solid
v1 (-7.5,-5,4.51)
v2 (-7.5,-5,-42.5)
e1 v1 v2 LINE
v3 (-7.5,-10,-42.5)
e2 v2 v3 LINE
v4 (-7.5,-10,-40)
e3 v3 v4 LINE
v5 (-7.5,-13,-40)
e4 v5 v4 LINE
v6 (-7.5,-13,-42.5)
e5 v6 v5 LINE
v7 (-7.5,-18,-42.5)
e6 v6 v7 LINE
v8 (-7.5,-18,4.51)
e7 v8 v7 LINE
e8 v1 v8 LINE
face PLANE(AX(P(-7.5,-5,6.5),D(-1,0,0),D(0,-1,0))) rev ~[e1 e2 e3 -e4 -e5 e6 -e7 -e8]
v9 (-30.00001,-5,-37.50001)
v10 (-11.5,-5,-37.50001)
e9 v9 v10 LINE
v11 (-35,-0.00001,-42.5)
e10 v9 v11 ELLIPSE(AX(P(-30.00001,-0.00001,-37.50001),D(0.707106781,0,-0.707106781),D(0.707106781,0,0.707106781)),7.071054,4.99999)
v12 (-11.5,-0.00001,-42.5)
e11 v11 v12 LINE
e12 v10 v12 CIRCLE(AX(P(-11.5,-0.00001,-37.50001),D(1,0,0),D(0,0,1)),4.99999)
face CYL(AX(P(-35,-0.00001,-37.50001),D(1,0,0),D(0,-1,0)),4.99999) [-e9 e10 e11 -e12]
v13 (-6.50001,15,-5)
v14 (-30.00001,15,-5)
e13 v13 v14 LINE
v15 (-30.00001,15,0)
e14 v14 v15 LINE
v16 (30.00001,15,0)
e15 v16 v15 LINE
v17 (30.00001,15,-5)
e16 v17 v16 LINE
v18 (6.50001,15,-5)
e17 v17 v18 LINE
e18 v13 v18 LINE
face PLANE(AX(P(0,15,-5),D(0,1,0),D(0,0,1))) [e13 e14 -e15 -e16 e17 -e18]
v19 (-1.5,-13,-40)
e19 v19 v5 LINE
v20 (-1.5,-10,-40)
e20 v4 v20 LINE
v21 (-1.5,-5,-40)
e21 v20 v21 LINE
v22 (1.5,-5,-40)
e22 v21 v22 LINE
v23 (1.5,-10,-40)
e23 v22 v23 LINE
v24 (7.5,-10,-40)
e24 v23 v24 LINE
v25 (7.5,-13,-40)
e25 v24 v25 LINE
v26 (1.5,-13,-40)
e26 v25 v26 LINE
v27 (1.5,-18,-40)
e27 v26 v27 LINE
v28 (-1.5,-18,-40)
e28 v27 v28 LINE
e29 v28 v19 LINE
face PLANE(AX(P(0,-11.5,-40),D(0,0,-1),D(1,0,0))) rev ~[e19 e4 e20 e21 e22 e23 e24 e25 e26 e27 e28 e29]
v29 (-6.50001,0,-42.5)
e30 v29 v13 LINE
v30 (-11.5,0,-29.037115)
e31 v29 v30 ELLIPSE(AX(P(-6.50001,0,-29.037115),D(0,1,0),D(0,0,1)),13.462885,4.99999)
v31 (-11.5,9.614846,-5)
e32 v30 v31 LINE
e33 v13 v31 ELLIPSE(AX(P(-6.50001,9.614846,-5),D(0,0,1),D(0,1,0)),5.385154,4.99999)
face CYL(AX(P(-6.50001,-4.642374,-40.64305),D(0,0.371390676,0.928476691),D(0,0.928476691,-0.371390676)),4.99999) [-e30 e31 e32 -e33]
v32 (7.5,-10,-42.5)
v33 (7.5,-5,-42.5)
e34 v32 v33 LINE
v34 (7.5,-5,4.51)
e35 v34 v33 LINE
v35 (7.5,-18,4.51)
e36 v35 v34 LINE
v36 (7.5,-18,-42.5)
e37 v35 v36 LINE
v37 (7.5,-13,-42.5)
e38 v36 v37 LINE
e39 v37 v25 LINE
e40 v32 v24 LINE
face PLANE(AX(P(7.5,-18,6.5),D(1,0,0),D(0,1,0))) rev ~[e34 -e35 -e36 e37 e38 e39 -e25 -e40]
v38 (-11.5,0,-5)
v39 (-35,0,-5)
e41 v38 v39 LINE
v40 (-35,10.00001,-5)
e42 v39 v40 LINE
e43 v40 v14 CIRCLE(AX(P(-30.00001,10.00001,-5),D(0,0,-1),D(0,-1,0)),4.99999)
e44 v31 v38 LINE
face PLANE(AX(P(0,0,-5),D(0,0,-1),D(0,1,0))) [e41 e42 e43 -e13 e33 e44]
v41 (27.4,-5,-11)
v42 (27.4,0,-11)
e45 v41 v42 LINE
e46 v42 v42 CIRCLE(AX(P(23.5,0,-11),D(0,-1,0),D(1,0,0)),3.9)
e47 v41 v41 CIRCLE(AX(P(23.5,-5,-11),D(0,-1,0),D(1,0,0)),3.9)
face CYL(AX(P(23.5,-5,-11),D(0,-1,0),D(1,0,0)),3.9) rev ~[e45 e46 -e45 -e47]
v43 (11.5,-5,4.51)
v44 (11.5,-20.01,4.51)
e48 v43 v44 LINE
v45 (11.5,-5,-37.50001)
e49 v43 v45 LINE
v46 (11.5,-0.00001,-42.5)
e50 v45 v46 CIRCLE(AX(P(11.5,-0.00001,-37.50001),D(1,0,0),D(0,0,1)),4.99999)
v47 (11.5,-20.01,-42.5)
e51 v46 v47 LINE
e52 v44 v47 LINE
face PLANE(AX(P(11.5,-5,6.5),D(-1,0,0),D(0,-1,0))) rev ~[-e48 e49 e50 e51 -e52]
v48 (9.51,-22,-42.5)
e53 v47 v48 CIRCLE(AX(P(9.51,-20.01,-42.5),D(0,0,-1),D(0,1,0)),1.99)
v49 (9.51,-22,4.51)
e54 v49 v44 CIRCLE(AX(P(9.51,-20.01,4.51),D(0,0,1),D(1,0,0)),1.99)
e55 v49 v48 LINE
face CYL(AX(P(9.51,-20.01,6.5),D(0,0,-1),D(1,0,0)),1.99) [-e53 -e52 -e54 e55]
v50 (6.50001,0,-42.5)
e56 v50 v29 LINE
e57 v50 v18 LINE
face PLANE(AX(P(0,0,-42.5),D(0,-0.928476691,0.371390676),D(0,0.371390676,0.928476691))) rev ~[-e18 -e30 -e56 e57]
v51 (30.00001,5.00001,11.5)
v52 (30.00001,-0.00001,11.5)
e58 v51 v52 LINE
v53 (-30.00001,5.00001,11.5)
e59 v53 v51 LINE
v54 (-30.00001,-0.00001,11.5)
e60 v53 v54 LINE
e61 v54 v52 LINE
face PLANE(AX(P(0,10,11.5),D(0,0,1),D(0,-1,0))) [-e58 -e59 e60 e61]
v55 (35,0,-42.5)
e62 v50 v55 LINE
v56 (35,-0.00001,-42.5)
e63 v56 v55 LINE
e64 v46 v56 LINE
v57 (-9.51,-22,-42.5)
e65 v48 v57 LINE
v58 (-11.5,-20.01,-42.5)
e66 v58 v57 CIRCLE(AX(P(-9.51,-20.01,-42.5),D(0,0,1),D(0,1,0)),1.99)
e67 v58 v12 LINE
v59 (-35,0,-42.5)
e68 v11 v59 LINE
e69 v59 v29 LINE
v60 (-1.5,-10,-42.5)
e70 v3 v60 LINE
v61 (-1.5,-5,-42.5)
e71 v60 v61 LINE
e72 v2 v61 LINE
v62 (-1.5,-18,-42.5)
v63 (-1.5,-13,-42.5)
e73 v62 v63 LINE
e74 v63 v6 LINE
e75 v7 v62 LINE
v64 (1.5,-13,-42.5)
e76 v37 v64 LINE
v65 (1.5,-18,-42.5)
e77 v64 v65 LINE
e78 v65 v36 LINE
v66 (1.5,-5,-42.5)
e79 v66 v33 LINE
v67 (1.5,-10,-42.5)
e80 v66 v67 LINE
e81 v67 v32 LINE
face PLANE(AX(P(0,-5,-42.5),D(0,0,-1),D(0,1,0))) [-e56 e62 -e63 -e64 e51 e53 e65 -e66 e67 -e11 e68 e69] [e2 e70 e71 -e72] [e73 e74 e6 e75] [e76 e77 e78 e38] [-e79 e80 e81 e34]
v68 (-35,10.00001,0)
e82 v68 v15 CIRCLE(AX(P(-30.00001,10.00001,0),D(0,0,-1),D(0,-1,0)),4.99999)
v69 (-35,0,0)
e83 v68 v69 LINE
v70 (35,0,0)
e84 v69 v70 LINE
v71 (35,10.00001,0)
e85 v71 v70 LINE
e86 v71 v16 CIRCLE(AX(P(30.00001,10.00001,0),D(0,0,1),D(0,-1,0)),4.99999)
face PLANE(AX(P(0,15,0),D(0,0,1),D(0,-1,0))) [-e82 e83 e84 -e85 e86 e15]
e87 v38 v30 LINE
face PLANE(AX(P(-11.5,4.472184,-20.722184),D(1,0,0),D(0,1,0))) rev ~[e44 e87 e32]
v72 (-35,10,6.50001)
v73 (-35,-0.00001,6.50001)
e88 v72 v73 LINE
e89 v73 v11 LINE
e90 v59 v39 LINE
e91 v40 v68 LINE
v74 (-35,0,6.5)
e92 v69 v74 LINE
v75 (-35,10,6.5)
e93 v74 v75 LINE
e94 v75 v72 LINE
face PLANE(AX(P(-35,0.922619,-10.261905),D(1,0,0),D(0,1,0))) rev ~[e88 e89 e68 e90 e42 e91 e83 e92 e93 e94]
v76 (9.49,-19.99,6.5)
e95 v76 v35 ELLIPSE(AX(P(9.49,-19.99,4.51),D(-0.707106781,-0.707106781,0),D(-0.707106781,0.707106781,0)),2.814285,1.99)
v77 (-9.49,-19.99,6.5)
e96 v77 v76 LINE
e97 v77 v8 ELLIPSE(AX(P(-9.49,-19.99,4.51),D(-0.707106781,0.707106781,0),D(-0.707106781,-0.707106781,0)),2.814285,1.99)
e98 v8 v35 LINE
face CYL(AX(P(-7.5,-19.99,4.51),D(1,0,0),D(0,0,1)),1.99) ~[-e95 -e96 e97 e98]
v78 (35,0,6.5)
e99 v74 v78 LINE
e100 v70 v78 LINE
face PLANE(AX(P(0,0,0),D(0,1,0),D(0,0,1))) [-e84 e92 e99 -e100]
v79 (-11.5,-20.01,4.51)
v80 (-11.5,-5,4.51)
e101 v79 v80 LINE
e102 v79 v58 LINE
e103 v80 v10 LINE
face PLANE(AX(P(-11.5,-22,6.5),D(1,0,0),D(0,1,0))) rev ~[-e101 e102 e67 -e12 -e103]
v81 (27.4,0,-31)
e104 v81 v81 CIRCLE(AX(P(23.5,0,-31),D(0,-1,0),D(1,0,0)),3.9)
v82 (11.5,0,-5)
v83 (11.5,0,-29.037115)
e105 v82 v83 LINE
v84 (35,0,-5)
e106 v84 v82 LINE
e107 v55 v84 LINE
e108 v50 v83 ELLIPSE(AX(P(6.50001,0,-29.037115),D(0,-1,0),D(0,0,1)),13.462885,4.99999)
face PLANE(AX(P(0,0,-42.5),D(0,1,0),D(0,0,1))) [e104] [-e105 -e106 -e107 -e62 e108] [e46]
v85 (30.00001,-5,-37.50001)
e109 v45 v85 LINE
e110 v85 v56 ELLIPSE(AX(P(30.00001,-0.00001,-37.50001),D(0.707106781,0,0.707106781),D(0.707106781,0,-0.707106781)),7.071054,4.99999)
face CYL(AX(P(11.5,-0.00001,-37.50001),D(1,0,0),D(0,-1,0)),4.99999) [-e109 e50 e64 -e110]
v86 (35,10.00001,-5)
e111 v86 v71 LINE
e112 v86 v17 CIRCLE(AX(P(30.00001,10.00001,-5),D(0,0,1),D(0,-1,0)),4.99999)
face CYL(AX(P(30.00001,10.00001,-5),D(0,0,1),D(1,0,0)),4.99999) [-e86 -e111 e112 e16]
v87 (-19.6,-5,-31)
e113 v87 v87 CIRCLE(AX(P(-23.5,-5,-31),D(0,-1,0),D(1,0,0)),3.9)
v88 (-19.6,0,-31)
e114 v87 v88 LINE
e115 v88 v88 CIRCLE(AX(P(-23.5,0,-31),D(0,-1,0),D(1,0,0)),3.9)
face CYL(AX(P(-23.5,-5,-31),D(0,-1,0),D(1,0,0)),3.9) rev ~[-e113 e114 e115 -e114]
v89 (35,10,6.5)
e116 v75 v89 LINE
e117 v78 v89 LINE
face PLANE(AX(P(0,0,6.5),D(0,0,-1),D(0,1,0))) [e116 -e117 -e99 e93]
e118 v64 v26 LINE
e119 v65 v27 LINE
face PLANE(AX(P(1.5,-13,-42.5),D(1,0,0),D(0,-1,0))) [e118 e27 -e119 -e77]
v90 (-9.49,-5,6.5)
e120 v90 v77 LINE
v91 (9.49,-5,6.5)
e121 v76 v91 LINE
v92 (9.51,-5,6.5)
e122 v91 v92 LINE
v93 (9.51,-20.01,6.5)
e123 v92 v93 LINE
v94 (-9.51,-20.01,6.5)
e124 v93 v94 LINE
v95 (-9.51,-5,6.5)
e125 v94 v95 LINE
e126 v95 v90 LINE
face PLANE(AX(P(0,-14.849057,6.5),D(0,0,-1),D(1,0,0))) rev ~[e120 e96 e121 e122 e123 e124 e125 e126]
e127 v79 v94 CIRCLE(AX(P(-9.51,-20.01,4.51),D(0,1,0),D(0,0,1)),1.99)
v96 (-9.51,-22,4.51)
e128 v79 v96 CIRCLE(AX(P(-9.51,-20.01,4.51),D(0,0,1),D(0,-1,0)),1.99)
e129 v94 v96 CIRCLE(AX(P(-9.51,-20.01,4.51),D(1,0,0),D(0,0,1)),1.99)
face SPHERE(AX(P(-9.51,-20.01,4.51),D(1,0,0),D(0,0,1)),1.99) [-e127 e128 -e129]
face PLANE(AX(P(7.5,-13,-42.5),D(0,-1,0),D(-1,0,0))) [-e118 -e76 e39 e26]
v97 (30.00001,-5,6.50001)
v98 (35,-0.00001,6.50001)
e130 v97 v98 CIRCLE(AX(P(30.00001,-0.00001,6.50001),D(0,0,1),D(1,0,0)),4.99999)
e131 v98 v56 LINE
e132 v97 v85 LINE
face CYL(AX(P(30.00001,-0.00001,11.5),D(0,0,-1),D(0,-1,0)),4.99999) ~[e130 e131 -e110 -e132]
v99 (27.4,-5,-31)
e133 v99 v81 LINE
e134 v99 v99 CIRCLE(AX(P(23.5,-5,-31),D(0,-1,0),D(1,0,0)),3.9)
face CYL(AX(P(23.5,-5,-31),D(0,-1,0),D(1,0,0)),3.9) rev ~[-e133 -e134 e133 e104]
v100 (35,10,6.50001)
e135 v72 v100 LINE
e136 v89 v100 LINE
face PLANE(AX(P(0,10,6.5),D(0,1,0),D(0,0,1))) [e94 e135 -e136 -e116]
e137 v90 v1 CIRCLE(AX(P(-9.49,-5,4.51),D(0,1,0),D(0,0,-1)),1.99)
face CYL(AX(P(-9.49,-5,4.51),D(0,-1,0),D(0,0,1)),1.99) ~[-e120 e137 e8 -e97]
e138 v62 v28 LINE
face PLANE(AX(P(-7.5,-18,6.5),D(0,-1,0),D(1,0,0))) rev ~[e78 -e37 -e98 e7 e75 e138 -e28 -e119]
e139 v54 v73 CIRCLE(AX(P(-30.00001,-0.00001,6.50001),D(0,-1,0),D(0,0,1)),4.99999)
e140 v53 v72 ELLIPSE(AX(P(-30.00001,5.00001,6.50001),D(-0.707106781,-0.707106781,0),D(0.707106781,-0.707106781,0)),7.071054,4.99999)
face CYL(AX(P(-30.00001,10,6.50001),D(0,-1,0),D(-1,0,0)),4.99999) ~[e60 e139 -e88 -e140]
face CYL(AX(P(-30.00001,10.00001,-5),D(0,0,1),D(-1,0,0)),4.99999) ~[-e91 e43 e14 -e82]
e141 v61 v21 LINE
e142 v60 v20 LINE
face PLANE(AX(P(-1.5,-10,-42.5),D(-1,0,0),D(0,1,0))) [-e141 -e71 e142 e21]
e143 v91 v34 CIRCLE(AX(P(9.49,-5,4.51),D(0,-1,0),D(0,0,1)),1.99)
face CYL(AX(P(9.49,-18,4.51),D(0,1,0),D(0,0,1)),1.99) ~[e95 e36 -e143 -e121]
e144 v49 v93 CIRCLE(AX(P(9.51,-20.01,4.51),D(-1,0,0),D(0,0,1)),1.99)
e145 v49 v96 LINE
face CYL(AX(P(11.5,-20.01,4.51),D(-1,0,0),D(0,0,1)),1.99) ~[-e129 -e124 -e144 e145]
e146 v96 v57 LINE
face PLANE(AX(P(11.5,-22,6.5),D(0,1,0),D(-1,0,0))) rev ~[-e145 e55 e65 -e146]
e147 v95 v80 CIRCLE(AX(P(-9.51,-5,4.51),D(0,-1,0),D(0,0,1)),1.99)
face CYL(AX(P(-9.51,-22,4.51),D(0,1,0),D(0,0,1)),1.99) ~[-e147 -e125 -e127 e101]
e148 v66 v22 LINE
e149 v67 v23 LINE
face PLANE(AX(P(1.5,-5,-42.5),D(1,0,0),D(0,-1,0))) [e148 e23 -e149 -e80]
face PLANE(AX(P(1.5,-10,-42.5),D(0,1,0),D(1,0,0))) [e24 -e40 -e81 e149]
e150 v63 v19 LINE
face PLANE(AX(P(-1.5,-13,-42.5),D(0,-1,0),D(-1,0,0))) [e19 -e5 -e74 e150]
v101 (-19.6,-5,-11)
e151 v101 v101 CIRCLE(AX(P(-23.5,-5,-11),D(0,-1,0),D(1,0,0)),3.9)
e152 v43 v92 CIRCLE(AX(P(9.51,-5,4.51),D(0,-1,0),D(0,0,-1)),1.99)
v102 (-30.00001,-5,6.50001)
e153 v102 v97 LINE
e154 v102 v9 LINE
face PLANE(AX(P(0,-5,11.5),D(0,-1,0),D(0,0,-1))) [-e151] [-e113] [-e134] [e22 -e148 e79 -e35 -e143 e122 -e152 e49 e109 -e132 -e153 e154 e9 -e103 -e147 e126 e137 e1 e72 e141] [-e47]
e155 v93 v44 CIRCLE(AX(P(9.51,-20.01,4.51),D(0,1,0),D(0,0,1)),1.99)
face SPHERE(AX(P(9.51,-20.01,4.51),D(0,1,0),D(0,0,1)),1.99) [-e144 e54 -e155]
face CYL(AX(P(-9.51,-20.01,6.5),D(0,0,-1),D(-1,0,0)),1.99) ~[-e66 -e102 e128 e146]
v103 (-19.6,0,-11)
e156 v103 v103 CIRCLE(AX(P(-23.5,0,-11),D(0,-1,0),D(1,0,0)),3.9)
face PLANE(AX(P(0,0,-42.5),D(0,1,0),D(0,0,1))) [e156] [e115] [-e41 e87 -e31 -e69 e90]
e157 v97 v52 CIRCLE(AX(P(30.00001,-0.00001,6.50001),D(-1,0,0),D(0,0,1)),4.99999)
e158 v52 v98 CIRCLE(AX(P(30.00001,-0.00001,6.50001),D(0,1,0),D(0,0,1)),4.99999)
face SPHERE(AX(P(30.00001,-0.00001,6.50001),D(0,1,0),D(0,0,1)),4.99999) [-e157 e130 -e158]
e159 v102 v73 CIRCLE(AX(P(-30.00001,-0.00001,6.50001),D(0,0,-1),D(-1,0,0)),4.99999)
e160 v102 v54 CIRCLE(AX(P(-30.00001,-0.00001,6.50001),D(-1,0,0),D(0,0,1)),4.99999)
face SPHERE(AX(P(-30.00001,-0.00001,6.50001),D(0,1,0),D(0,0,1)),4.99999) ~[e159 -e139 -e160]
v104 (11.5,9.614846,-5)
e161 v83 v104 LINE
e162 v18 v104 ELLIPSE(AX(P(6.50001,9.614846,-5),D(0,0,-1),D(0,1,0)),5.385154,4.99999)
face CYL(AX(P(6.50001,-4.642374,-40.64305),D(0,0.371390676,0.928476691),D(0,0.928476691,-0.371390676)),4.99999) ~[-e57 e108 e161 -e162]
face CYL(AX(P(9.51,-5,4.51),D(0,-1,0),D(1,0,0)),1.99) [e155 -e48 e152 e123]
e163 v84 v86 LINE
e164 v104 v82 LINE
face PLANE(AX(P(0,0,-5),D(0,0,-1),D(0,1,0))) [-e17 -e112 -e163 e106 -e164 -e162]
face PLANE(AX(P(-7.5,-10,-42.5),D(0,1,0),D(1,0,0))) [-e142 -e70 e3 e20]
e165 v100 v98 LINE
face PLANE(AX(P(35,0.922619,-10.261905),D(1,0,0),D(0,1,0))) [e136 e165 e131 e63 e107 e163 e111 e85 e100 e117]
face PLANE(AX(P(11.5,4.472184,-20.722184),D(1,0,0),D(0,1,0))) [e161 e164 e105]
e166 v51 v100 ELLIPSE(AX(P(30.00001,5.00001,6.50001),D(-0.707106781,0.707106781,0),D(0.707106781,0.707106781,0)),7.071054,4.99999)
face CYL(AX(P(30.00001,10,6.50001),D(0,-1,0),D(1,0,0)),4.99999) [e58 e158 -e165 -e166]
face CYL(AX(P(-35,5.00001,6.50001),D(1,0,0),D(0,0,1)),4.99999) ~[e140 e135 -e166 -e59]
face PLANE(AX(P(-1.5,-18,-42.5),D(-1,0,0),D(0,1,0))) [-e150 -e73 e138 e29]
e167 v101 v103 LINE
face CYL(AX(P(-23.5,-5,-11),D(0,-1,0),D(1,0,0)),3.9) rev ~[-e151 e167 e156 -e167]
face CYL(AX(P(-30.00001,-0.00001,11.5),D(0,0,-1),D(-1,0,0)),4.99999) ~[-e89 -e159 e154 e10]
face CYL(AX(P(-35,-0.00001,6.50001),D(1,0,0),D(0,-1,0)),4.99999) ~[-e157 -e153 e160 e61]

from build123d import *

# Parameters (mm, degrees)
F1_DEPTH       = 35
F1_DEPTH_BACK  = 35
F3_DEPTH       = 49
F4_R           = 1.99
F5_R           = 3.9
F6_DEPTH       = 25
F8_DEPTH       = 2.5
F10_DEPTH      = 11.5
F10_DEPTH_BACK = 11.5
F11_R          = 4.99999


# Not quite as in the source:
# - a fillet or chamfer is up to 0.001 mm smaller than in the source, because OpenCascade refuses the exact size


with BuildPart() as f1:
    # F0 (on Right) → F1 (new body, two sides)
    with BuildSketch(Plane.YZ) as f1_sk:
        Polygon((15, 0), (0, 0), (0, 6.5), (10, 6.5), (10, 11.5), (-5, 11.5), (-5, -5), (-5, -42.5), (0, -42.5), (0, -5), (15, -5), align=None)
    extrude(amount=F1_DEPTH)
    extrude(f1_sk.sketch, amount=-F1_DEPTH_BACK)

    # F2 (on face) → F3 (join, through all)
    with BuildSketch(Plane(origin=(0, 0, 6.5), x_dir=(1, 0, 0), z_dir=(0, 0, -1))):
        Polygon((7.5, 18), (7.5, 5), (11.5, 5), (11.5, 22), (0, 22), (-11.5, 22), (-11.5, 5), (-7.5, 5), (-7.5, 18), (0, 18), align=None)
    extrude(amount=F3_DEPTH)

    # F4
    f4_edges = [f1.edges().sort_by_distance(p)[0] for p in [
        (11.5, -13.5, 6.5),
        (7.5, -11.5, 6.5),
        (-7.5, -11.5, 6.5),
        (0, -18, 6.5),
        (0, -22, 6.5),
        (-11.5, -13.5, 6.5),
        (-11.5, -22, -18),
        (11.5, -22, -18),
    ]]
    fillet(f4_edges, radius=F4_R)

    # F5 (on face) → F6 (cut)
    with BuildSketch(Plane.XZ.offset(5)):
        with Locations((23.5, -11)):
            Circle(F5_R)
        with Locations((23.5, -31)):
            Circle(F5_R)
        with Locations((-23.5, -11)):
            Circle(F5_R)
        with Locations((-23.5, -31)):
            Circle(F5_R)
    extrude(amount=-F6_DEPTH, mode=Mode.SUBTRACT)

    # F7 (on face) → F8 (join)
    with BuildSketch(Plane(origin=(0, 0, -42.5), x_dir=(1, 0, 0), z_dir=(0, 0, -1))):
        Polygon((1.5, 18), (0, 18), (-1.5, 18), (-1.5, 13), (-7.5, 13), (-7.5, 11.5), (-7.5, 10), (-1.5, 10), (-1.5, 5), (0, 5), (1.5, 5), (1.5, 10), (7.5, 10), (7.5, 11.5), (7.5, 13), (1.5, 13), align=None)
    extrude(amount=-F8_DEPTH)

    # F9 (on Right) → F10 (join, two sides)
    with BuildSketch(Plane.YZ) as f10_sk:
        Polygon((0, -5), (0, -42.5), (15, -5), align=None)
    extrude(amount=-F10_DEPTH)
    extrude(f10_sk.sketch, amount=F10_DEPTH_BACK)

    # F11 (radius 5 in the source; OpenCascade refuses exactly that, so slightly less here)
    f11_edges = [f1.edges().sort_by_distance(p)[0] for p in [
        (-23.25, -5, -42.5),
        (23.25, -5, -42.5),
        (0, 10, 11.5),
        (35, 2.5, 11.5),
        (-35, 2.5, 11.5),
        (0, -5, 11.5),
        (-35, -5, -15.5),
        (35, -5, -15.5),
        (11.5, 7.5, -23.75),
        (-11.5, 7.5, -23.75),
        (35, 15, -2.5),
        (-35, 15, -2.5),
    ]]
    fillet(f11_edges, radius=F11_R)


solid = f1.part
